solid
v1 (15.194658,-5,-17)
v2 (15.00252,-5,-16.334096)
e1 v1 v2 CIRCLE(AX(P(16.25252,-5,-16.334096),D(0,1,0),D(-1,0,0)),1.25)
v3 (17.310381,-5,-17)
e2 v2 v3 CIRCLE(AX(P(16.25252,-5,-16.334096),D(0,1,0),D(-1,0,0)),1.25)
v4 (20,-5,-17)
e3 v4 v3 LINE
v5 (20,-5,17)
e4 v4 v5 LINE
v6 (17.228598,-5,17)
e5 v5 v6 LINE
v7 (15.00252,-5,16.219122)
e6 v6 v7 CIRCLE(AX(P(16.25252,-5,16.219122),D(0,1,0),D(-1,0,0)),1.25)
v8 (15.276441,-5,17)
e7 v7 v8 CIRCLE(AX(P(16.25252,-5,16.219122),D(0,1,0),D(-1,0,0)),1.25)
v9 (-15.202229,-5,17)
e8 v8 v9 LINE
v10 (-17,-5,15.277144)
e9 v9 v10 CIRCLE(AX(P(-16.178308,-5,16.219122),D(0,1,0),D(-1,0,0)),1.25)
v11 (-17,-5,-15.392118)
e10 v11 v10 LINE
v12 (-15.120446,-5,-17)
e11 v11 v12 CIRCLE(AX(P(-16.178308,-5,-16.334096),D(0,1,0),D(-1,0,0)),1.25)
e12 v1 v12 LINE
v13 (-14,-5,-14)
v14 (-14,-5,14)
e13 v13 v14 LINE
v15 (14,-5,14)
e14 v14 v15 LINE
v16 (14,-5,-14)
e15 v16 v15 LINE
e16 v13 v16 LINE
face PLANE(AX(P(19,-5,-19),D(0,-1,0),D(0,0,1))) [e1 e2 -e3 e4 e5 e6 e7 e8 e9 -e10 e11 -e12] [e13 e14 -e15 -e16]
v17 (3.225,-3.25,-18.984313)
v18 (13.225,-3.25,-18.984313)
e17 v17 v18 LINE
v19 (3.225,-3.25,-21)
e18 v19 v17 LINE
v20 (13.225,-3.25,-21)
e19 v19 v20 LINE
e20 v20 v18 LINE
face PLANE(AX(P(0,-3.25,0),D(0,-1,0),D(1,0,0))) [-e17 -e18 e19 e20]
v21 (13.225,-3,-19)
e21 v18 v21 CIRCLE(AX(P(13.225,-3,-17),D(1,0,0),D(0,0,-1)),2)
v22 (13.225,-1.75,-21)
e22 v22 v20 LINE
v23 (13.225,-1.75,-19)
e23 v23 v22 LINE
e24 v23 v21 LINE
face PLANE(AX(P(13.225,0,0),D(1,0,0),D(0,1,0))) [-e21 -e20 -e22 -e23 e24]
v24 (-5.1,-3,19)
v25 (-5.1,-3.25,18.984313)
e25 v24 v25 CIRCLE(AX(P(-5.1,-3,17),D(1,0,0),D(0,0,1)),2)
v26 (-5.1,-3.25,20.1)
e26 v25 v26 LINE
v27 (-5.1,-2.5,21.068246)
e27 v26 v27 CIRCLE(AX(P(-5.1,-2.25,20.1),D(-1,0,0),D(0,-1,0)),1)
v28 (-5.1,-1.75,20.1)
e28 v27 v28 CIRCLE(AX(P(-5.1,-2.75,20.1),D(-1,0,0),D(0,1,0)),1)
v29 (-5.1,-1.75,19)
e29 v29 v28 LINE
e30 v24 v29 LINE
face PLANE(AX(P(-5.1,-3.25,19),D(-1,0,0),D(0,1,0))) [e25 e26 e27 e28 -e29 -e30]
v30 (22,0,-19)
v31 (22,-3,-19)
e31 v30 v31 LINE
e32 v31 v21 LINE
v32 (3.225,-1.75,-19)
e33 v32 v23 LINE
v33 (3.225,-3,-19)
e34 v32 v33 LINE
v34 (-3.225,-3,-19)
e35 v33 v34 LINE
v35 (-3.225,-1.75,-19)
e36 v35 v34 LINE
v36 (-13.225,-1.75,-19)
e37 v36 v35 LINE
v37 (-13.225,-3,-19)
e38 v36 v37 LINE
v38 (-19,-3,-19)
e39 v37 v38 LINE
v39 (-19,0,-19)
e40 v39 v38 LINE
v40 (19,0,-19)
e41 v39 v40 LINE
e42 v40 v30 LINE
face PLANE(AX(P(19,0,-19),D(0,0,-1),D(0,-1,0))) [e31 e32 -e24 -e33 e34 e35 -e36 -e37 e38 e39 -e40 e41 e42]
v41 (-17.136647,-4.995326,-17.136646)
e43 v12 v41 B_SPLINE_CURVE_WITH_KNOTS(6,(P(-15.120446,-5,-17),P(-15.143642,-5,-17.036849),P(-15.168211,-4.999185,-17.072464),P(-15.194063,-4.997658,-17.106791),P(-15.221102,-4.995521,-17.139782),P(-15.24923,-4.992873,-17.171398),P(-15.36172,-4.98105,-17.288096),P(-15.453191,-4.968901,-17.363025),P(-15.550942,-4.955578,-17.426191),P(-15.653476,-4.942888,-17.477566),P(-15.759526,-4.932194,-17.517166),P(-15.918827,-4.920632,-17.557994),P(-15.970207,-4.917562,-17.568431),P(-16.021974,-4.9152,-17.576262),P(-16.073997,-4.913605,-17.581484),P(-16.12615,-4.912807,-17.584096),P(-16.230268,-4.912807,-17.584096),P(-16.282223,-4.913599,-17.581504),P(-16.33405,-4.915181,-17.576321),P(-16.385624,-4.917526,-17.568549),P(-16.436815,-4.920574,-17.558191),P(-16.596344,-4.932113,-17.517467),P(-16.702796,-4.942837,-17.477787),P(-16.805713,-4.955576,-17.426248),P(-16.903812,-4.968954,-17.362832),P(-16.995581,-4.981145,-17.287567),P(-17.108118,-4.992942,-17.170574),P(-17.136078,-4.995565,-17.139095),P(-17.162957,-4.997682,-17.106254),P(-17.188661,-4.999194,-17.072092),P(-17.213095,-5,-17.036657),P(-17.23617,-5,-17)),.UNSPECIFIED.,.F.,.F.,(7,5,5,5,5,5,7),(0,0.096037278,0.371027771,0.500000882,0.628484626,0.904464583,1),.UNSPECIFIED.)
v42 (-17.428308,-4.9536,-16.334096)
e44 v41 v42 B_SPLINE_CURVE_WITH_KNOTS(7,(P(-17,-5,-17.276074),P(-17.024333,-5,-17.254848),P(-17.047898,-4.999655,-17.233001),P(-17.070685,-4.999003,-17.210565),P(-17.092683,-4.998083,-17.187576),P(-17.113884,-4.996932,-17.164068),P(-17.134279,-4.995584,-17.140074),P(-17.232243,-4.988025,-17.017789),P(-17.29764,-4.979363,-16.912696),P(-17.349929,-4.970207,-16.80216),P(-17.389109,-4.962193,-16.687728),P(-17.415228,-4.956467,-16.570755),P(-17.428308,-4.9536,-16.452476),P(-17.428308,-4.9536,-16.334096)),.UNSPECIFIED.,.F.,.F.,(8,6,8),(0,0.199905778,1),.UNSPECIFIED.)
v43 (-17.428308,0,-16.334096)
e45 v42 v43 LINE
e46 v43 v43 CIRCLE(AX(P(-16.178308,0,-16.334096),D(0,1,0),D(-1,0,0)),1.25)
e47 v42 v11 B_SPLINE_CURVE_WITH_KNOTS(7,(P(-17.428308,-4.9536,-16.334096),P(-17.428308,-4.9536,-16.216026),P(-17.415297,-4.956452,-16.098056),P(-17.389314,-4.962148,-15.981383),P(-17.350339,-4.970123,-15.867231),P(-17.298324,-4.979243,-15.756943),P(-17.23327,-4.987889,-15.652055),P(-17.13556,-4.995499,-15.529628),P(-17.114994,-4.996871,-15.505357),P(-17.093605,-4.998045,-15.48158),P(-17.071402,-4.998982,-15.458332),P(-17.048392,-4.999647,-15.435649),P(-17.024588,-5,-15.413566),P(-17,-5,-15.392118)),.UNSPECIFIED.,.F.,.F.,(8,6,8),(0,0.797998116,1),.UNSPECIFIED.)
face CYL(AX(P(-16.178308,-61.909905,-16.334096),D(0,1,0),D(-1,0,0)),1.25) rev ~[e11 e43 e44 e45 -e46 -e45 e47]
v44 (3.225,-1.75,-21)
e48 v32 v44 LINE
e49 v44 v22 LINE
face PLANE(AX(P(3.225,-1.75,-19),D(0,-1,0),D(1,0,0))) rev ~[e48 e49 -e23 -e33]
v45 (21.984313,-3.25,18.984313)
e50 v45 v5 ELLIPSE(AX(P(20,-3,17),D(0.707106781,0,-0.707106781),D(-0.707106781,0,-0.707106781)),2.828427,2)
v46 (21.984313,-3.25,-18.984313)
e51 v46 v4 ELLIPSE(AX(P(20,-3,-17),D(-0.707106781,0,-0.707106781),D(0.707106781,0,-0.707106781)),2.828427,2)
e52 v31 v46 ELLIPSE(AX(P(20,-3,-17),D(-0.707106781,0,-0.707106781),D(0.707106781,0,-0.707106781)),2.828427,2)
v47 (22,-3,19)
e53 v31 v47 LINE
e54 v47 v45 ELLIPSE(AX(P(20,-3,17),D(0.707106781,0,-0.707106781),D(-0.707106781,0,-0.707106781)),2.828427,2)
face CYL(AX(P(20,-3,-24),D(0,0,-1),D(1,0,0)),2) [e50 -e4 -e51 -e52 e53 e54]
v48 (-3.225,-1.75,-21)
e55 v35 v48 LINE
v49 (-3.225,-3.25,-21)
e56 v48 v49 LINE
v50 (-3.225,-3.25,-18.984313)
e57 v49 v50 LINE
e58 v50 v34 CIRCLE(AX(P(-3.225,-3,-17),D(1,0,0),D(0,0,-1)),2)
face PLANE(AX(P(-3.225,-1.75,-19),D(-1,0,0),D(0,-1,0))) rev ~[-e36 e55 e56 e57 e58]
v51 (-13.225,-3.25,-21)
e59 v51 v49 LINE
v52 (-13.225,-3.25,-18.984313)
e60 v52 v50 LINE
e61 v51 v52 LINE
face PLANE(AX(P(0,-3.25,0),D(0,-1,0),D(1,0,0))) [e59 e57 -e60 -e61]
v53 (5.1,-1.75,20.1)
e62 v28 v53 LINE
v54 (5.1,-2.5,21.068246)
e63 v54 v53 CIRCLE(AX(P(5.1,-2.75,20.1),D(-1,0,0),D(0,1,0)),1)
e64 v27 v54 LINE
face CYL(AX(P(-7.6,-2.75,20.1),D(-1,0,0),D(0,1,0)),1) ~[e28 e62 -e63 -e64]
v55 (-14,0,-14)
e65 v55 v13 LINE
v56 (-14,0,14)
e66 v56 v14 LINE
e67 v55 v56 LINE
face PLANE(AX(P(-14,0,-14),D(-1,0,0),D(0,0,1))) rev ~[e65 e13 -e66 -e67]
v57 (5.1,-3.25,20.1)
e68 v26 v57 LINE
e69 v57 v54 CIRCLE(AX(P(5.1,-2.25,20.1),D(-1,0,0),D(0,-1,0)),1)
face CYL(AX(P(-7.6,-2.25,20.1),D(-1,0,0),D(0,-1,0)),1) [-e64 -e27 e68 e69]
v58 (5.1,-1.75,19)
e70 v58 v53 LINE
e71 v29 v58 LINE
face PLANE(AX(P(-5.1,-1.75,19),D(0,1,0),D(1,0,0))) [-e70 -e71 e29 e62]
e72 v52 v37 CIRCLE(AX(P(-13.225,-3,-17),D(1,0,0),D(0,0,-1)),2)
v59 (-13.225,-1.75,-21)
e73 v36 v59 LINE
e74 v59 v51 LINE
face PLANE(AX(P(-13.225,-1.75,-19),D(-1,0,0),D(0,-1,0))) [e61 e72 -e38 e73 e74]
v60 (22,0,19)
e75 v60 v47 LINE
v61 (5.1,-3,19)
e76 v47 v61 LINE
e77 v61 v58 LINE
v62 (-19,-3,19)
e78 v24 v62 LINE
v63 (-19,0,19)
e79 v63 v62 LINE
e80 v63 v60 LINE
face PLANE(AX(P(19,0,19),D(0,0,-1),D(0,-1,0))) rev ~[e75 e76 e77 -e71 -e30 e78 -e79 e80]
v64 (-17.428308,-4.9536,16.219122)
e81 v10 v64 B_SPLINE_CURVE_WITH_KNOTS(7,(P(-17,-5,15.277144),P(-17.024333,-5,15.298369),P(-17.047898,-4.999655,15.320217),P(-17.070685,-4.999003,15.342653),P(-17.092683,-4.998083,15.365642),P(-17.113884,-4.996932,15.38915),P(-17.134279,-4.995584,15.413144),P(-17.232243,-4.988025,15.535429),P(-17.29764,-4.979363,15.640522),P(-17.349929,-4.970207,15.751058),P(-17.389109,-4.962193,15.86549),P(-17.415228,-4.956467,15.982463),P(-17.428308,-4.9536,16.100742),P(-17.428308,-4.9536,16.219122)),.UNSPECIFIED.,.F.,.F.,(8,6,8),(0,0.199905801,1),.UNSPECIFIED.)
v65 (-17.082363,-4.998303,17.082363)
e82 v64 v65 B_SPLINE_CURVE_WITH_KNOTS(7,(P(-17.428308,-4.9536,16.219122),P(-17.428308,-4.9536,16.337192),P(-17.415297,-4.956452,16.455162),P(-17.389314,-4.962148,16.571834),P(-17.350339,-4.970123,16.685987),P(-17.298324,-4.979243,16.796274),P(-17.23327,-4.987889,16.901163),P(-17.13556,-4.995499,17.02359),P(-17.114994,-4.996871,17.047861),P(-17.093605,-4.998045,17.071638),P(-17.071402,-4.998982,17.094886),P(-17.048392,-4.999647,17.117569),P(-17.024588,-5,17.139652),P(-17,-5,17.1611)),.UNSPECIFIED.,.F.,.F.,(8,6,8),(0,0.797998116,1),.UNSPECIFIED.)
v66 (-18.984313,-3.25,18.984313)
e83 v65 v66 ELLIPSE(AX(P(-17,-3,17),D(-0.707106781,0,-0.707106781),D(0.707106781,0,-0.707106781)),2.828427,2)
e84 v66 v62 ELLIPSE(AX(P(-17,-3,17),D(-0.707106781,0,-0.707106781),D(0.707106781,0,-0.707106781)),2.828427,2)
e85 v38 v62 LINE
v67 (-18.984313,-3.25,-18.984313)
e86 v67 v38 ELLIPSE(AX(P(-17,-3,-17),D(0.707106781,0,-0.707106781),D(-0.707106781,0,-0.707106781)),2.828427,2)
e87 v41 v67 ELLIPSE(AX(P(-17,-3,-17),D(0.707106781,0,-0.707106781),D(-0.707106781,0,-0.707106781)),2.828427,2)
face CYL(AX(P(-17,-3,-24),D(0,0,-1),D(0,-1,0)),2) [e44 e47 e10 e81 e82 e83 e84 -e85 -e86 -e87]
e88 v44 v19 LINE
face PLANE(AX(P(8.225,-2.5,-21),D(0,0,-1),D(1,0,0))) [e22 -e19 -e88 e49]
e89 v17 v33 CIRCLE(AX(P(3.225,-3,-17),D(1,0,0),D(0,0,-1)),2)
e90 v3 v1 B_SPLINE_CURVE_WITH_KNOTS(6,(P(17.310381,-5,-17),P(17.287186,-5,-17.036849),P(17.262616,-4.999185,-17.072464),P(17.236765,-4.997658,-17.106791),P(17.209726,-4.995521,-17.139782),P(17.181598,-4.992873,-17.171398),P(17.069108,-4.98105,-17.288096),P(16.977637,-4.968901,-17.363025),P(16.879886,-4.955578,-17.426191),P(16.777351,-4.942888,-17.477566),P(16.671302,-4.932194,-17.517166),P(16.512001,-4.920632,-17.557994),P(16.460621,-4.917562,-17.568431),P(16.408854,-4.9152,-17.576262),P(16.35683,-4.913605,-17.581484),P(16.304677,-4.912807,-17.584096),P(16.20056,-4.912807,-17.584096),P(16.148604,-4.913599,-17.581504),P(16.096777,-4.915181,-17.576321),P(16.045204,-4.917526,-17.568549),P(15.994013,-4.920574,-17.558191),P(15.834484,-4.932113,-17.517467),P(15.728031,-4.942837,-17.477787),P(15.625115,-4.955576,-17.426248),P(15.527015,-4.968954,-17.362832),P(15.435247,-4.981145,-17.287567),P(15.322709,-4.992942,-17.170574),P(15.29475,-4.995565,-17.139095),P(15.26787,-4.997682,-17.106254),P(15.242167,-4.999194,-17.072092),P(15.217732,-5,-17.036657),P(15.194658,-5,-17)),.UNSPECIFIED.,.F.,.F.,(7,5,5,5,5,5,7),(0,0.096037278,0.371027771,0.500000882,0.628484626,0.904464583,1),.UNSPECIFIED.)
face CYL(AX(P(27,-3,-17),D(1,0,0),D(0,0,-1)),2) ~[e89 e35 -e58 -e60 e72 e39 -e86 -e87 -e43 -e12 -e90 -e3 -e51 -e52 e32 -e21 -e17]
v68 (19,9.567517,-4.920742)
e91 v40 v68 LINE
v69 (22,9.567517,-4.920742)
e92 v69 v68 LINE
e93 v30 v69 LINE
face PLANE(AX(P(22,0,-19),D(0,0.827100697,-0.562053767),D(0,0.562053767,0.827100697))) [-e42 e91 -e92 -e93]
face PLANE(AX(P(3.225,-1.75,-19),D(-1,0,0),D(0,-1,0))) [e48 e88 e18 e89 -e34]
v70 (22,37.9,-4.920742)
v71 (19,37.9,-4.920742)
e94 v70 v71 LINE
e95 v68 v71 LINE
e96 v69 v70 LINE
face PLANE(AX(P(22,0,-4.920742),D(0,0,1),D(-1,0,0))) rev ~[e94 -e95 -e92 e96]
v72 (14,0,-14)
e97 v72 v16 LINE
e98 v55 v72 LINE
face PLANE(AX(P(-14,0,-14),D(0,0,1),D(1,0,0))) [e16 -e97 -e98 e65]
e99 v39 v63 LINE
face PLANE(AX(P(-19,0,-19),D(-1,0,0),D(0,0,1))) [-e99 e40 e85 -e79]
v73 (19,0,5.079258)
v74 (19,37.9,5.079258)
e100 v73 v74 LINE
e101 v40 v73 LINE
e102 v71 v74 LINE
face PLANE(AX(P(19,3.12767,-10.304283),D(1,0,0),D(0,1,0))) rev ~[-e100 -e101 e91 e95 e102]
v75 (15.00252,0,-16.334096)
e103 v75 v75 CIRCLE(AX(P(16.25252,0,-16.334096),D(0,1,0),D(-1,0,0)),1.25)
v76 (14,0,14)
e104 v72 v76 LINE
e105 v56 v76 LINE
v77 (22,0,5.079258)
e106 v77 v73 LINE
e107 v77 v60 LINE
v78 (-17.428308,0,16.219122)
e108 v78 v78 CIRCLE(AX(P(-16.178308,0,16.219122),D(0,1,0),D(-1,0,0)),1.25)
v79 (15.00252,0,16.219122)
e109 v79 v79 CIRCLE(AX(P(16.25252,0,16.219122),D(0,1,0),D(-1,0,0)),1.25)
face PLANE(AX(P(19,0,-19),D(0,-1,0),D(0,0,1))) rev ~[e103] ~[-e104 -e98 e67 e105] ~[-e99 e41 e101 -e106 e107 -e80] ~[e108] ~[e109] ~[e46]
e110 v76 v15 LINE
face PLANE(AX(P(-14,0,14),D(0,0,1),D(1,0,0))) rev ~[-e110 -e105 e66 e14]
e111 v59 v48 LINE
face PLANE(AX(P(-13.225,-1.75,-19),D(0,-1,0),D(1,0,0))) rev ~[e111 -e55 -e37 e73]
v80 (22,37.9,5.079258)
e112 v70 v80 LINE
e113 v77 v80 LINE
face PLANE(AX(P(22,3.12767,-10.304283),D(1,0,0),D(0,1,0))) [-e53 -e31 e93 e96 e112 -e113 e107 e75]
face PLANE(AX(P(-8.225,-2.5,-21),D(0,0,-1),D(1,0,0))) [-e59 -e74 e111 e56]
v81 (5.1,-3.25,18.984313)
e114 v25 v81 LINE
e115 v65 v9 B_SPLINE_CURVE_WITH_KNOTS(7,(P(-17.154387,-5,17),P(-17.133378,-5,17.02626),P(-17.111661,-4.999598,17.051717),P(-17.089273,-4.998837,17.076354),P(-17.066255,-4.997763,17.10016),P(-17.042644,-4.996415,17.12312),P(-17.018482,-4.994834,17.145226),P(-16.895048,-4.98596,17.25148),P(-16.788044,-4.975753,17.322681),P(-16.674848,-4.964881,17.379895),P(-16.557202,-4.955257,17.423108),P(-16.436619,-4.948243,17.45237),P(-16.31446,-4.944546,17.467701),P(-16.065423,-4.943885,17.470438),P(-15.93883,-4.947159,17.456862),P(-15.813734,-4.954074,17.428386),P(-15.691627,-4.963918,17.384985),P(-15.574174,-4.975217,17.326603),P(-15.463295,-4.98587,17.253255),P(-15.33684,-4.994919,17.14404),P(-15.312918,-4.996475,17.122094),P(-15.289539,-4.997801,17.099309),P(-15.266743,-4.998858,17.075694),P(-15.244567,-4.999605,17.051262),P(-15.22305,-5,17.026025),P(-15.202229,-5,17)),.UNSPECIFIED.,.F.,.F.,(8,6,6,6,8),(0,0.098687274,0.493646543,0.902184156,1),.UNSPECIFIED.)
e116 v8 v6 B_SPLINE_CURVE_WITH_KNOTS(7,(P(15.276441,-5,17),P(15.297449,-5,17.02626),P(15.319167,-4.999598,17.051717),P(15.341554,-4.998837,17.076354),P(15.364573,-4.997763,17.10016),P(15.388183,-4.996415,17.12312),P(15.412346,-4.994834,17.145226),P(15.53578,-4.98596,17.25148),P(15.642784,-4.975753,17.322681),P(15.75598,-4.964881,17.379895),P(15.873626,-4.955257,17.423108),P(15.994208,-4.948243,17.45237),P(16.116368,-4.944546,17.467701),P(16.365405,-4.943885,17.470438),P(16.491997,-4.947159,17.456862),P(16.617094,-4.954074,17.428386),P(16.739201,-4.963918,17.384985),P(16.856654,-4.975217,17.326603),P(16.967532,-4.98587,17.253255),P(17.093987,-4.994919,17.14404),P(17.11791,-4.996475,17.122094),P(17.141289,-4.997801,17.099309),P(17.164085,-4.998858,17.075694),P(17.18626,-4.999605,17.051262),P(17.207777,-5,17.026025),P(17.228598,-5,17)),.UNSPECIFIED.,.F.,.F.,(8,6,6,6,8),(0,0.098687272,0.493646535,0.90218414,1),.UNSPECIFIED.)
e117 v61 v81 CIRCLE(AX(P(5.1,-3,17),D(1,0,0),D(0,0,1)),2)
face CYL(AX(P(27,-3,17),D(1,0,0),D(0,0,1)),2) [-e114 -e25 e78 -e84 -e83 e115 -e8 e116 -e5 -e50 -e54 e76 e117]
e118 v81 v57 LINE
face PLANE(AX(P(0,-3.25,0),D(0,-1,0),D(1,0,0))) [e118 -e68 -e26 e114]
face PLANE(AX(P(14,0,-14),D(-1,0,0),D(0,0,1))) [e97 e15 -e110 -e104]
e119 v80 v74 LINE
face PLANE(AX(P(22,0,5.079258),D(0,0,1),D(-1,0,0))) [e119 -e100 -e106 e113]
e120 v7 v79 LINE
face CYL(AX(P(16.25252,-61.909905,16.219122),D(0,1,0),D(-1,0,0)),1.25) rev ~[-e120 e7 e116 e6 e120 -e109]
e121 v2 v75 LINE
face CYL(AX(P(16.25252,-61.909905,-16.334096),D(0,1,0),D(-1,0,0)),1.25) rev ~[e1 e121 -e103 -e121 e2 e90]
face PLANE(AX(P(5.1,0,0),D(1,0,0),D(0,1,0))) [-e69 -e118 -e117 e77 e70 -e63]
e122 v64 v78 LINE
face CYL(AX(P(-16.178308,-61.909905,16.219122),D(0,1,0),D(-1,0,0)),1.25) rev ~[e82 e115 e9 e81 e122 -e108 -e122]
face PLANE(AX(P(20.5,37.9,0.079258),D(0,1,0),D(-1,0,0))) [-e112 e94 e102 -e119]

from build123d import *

# Parameters (mm, degrees)
F0_W          = 38
F0_H          = 38
F0_W_2        = 28
F0_H_2        = 28
F1_DEPTH      = 5
F2_W          = 10.2
F2_H          = 1.5
F3_DEPTH      = 2.1
F4_T1_DEPTH   = 15.2
F5_W          = 10
F5_H          = 1.5
F6_DEPTH      = 2
F8_D          = 2.5
F9_DEPTH      = 3
F10_W         = 3
F10_H         = 10
F11_DEPTH     = 37.9
F13_DEPTH     = 3
F14_T1_DEPTH  = 48
F14_T6_DEPTH  = 51
F14_T11_DEPTH = 51
F14_T16_DEPTH = 51
F14_T21_DEPTH = 51
F14_T26_DEPTH = 51
F14_T31_DEPTH = 51
F14_T37_DEPTH = 51


# Not quite as in the source:
# - a fillet or chamfer that OpenCascade refuses, or shapes differently, is made with other operations: its cross-section is extruded or revolved along the edge and cut away or added


with BuildPart() as f1:
    # F0 (on Front) → F1 (new body)
    with BuildSketch(Plane.XZ):
        Rectangle(F0_W, F0_H)
        Rectangle(F0_W_2, F0_H_2, mode=Mode.SUBTRACT)
    extrude(amount=F1_DEPTH)

    # F2 (on face) → F3 (join)
    with BuildSketch(Plane.XY.offset(19)):
        with Locations((0, -2.5)):
            Rectangle(F2_W, F2_H)
    extrude(amount=F3_DEPTH)

    # F4: fillet of radius 1 on 2 edges, made by hand

    # F4_s2 → F4_t1 (cut)
    with BuildSketch(Plane.YZ.offset(-7.6)):
        with BuildLine():
            ThreePointArc((-3.25, 20.1), (-2.9571067812, 20.8071067812), (-2.25, 21.1))
            Line((-2.25, 21.1), (-3.25, 21.1))
            Line((-3.25, 21.1), (-3.25, 20.1))
        make_face()
        with BuildLine():
            ThreePointArc((-1.75, 20.1), (-2.0428932188, 20.8071067812), (-2.75, 21.1))
            Line((-2.75, 21.1), (-1.75, 21.1))
            Line((-1.75, 21.1), (-1.75, 20.1))
        make_face()
    extrude(amount=F4_T1_DEPTH, mode=Mode.SUBTRACT)

    # F5 (on face) → F6 (join)
    with BuildSketch(Plane(origin=(0, 0, -19), x_dir=(1, 0, 0), z_dir=(0, 0, -1))):
        with Locations((-8.225, 2.5)):
            Rectangle(F5_W, F5_H)
        with Locations((8.225, 2.5)):
            Rectangle(F5_W, F5_H)
    extrude(amount=F6_DEPTH)

    # F8 (through all)
    with Locations(Plane.XZ.offset(5)):
        with Locations((16.2525195628, 16.2191219109), (-16.1783080548, 16.2191219109), (-16.1783080548, -16.3340959698), (16.2525195628, -16.3340959698)):
            Hole(F8_D / 2)

    # F9 (add): a face of the model
    f9_faces = [f1.faces().sort_by_distance(p)[0] for p in [
        (19, -2.5, 0),
    ]]
    extrude(f9_faces, amount=F9_DEPTH)

    # F10 (on face) → F11 (join)
    with BuildSketch(Plane(origin=(0, 0, 0), x_dir=(-1, 0, 0), z_dir=(0, 1, 0))):
        with Locations((-20.5, 0.0792577478)):
            Rectangle(F10_W, F10_H)
    extrude(amount=F11_DEPTH)

    # F12 (on face) → F13 (join, through all)
    with BuildSketch(Plane.YZ.offset(22)):
        Polygon((0, -4.9207422522), (0, -19), (9.5675168559, -4.9207422522), align=None)
    extrude(amount=-F13_DEPTH)

    # F14: fillet of radius 2 on 4 edges, made by hand

    # F14_s2 → F14_t1 (cut)
    with BuildSketch(Plane.XY.offset(-24)):
        with BuildLine():
            ThreePointArc((22, -3), (21.4142135624, -4.4142135624), (20, -5))
            Line((20, -5), (22, -5))
            Line((22, -5), (22, -3))
        make_face()
        with BuildLine():
            ThreePointArc((-17, -5), (-18.4142135624, -4.4142135624), (-19, -3))
            Line((-19, -3), (-19, -5))
            Line((-19, -5), (-17, -5))
        make_face()
    extrude(amount=F14_T1_DEPTH, mode=Mode.SUBTRACT)


with BuildPart() as f14_tool4:
    # F14_s5 → F14_t6 (new body)
    with BuildSketch(Plane.YZ.offset(27)):
        with BuildLine():
            ThreePointArc((-3, 19), (-4.4142135624, 18.4142135624), (-5, 17))
            Line((-5, 17), (-5, 19))
            Line((-5, 19), (-3, 19))
        make_face()
    extrude(amount=-F14_T6_DEPTH)

    split(bisect_by=Plane.YZ.offset(5.1), keep=Keep.TOP)


with BuildPart() as f1_1:
    add(f1.part)

    # F14_t3: cut F14_tool4
    add(f14_tool4.part, mode=Mode.SUBTRACT)


with BuildPart() as f14_tool9:
    # F14_s10 → F14_t11 (new body)
    with BuildSketch(Plane.YZ.offset(27)):
        with BuildLine():
            ThreePointArc((-3, 19), (-4.4142135624, 18.4142135624), (-5, 17))
            Line((-5, 17), (-5, 19))
            Line((-5, 19), (-3, 19))
        make_face()
    extrude(amount=-F14_T11_DEPTH)

    split(bisect_by=Plane.XZ.offset(3.25), keep=Keep.TOP)


with BuildPart() as f1_2:
    add(f1_1.part)

    # F14_t8: cut F14_tool9
    add(f14_tool9.part, mode=Mode.SUBTRACT)


with BuildPart() as f14_tool14:
    # F14_s15 → F14_t16 (new body)
    with BuildSketch(Plane.YZ.offset(27)):
        with BuildLine():
            ThreePointArc((-3, 19), (-4.4142135624, 18.4142135624), (-5, 17))
            Line((-5, 17), (-5, 19))
            Line((-5, 19), (-3, 19))
        make_face()
    extrude(amount=-F14_T16_DEPTH)

    split(bisect_by=Plane.YZ.offset(-5.1), keep=Keep.BOTTOM)


with BuildPart() as f1_3:
    add(f1_2.part)

    # F14_t13: cut F14_tool14
    add(f14_tool14.part, mode=Mode.SUBTRACT)


with BuildPart() as f14_tool19:
    # F14_s20 → F14_t21 (new body)
    with BuildSketch(Plane.YZ.offset(27)):
        with BuildLine():
            ThreePointArc((-3, -19), (-4.4142135624, -18.4142135624), (-5, -17))
            Line((-5, -17), (-5, -19))
            Line((-5, -19), (-3, -19))
        make_face()
    extrude(amount=-F14_T21_DEPTH)

    split(bisect_by=Plane.YZ.offset(13.225), keep=Keep.TOP)


with BuildPart() as f1_4:
    add(f1_3.part)

    # F14_t18: cut F14_tool19
    add(f14_tool19.part, mode=Mode.SUBTRACT)


with BuildPart() as f14_tool24:
    # F14_s25 → F14_t26 (new body)
    with BuildSketch(Plane.YZ.offset(27)):
        with BuildLine():
            ThreePointArc((-3, -19), (-4.4142135624, -18.4142135624), (-5, -17))
            Line((-5, -17), (-5, -19))
            Line((-5, -19), (-3, -19))
        make_face()
    extrude(amount=-F14_T26_DEPTH)

    split(bisect_by=Plane.XZ.offset(3.25), keep=Keep.TOP)


with BuildPart() as f1_5:
    add(f1_4.part)

    # F14_t23: cut F14_tool24
    add(f14_tool24.part, mode=Mode.SUBTRACT)


with BuildPart() as f14_tool29:
    # F14_s30 → F14_t31 (new body)
    with BuildSketch(Plane.YZ.offset(27)):
        with BuildLine():
            ThreePointArc((-3, -19), (-4.4142135624, -18.4142135624), (-5, -17))
            Line((-5, -17), (-5, -19))
            Line((-5, -19), (-3, -19))
        make_face()
    extrude(amount=-F14_T31_DEPTH)

    split(bisect_by=Plane.YZ.offset(3.225), keep=Keep.BOTTOM)

    split(bisect_by=Plane.YZ.offset(-3.225), keep=Keep.TOP)


with BuildPart() as f1_6:
    add(f1_5.part)

    # F14_t28: cut F14_tool29
    add(f14_tool29.part, mode=Mode.SUBTRACT)


with BuildPart() as f14_tool35:
    # F14_s36 → F14_t37 (new body)
    with BuildSketch(Plane.YZ.offset(27)):
        with BuildLine():
            ThreePointArc((-3, -19), (-4.4142135624, -18.4142135624), (-5, -17))
            Line((-5, -17), (-5, -19))
            Line((-5, -19), (-3, -19))
        make_face()
    extrude(amount=-F14_T37_DEPTH)

    split(bisect_by=Plane.YZ.offset(-13.225), keep=Keep.BOTTOM)


with BuildPart() as f1_7:
    add(f1_6.part)

    # F14_t34: cut F14_tool35
    add(f14_tool35.part, mode=Mode.SUBTRACT)


solid = f1_7.part
